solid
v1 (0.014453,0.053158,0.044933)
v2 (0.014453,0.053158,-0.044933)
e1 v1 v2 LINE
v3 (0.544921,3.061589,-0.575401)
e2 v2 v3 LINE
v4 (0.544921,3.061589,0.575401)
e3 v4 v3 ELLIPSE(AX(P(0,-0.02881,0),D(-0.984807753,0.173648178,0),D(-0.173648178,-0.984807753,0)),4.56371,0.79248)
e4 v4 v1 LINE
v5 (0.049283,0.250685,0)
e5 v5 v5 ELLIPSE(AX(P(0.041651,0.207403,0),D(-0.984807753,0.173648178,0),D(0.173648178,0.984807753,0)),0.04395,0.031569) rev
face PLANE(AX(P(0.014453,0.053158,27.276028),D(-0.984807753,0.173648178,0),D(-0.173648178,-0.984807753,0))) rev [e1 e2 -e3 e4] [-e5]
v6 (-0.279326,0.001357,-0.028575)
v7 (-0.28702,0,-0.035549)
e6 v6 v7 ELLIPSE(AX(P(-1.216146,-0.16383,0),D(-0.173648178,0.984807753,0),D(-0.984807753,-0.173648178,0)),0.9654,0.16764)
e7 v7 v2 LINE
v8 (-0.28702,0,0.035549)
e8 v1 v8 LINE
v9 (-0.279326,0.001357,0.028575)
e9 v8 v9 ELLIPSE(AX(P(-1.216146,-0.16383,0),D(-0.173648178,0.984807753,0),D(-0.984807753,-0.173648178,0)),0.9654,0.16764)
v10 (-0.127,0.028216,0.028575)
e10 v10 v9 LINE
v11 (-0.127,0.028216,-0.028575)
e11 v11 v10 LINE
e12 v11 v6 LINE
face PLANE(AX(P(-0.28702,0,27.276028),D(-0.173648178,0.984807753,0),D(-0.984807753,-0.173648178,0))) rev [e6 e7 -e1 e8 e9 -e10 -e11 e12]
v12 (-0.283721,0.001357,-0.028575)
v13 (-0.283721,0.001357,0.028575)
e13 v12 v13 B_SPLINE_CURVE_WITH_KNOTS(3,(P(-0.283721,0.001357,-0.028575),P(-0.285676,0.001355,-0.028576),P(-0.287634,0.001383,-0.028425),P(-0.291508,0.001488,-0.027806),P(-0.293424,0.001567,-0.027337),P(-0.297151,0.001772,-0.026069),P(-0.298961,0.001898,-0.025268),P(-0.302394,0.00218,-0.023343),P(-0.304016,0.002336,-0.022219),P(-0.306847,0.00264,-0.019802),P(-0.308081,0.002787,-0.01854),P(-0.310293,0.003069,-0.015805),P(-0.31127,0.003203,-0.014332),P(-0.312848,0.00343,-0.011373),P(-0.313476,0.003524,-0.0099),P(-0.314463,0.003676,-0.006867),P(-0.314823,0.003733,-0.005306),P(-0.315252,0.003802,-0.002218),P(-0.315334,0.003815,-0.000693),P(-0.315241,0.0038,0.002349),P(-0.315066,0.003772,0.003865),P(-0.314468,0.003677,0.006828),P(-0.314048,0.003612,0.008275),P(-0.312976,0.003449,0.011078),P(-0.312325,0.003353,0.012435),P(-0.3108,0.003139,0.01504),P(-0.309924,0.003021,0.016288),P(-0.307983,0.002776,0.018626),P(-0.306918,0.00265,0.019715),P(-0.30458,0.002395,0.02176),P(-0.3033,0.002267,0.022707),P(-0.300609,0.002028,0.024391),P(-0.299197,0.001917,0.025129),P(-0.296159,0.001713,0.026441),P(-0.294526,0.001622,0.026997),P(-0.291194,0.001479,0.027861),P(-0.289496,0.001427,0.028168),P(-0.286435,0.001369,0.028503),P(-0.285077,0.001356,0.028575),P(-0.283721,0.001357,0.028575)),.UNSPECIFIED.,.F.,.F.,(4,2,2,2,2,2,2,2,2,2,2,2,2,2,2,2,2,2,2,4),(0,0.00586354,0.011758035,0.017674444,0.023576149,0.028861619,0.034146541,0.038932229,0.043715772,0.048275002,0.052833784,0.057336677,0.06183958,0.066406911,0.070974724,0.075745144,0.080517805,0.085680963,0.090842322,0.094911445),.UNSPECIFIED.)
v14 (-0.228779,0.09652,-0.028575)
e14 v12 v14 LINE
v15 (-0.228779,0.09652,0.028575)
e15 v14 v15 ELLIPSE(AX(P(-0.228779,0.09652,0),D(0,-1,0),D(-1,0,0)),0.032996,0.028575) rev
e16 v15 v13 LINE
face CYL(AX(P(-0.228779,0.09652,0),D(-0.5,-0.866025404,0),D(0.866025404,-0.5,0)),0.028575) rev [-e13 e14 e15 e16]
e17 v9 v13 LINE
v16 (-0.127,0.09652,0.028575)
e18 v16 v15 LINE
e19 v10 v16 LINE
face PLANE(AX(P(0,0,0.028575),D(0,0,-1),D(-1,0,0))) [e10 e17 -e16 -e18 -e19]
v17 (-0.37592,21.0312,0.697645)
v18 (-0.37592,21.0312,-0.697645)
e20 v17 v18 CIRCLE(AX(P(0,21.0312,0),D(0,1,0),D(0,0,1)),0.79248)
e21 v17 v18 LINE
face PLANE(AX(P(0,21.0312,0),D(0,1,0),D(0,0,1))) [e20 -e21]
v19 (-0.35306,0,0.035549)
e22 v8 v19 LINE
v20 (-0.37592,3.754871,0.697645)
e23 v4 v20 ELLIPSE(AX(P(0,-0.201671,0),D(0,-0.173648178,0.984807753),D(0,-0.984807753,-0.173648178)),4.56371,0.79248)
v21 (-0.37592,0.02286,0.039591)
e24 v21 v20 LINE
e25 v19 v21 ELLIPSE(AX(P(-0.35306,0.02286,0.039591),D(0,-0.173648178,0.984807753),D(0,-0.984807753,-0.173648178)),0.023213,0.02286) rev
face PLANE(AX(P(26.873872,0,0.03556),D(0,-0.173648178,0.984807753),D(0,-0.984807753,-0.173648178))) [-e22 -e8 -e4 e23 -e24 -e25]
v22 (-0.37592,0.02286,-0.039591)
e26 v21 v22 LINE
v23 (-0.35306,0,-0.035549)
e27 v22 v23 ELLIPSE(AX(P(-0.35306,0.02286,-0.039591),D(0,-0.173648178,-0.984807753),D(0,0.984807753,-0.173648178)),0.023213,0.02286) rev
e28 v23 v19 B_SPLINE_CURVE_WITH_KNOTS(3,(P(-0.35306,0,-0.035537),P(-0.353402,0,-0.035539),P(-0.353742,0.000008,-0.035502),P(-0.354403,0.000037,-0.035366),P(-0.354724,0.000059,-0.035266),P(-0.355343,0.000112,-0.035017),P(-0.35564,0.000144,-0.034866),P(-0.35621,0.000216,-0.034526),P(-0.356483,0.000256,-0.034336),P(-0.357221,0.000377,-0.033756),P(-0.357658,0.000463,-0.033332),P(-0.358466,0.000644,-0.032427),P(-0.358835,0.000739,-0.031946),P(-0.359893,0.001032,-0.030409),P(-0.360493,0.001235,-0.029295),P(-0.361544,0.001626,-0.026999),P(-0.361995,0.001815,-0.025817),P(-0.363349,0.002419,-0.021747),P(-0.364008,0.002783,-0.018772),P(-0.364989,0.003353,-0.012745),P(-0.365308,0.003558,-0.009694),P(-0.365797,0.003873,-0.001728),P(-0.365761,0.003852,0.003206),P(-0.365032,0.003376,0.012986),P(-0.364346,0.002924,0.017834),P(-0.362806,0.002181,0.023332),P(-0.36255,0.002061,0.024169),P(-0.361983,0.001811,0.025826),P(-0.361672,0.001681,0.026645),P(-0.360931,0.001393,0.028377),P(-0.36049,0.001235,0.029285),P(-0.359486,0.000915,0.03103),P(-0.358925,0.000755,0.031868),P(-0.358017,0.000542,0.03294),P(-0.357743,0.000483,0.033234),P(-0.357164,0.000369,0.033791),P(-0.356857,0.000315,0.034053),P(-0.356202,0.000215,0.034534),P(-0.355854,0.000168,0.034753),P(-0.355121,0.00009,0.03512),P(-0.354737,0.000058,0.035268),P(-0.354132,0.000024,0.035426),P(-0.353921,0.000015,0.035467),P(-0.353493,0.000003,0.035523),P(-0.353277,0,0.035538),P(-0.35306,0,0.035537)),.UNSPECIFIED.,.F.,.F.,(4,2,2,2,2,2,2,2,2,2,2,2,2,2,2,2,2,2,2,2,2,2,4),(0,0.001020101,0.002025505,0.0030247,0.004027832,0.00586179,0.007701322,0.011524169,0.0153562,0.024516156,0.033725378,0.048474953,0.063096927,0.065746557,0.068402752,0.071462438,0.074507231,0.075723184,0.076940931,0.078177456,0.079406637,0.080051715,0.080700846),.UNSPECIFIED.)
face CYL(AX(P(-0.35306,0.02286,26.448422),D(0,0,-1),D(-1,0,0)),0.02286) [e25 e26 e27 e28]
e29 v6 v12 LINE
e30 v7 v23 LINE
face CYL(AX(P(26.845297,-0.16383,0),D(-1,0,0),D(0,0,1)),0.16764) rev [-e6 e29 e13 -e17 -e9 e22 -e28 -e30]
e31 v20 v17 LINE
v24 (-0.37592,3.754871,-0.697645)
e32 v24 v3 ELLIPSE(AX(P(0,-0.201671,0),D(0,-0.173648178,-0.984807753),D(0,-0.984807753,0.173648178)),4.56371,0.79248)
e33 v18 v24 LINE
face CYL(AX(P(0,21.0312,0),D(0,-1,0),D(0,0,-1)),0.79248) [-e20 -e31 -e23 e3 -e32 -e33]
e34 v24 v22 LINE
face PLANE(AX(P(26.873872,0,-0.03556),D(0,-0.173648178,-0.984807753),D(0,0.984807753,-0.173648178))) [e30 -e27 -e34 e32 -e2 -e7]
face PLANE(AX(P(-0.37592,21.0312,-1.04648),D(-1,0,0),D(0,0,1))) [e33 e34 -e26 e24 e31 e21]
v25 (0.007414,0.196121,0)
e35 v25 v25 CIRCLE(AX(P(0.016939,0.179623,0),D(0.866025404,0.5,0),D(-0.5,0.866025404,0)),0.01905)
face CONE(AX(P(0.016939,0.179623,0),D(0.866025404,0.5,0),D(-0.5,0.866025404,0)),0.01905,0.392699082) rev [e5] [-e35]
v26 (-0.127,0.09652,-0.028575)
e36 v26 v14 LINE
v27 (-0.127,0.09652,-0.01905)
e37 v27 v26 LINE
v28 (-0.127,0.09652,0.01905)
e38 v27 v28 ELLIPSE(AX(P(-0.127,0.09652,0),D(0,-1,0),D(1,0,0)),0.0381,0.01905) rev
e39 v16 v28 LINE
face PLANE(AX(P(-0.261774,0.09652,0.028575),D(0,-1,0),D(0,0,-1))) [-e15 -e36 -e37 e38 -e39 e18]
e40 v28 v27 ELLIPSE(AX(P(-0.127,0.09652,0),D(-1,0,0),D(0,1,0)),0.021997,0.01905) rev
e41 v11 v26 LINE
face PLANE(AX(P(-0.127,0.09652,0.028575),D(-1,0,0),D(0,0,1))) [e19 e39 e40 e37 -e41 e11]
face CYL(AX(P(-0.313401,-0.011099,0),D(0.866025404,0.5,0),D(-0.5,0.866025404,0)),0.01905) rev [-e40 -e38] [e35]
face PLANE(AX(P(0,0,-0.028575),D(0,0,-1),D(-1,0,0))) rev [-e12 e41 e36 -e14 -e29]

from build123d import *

# Parameters (mm, degrees)
TD_SKETCH_R                             = 0.79248
TL_FEATURE_DEPTH                        = 21.0312
TDF_STD_SKETCH_W                        = 2.09296
TDF_STD_SKETCH_H                        = 2.09296
TDF_STD_FEATURE_DEPTH                   = 22.061040395
ISA_20_STD_FEATURE_DEPTH                = 22.061040395
ISA_20_STD_FEATURE_DEPTH_BACK           = 22.061040395
F_10BA_STD_FEATURE_DEPTH                = 22.061040395
F_10BA_STD_FEATURE_DEPTH_BACK           = 22.061040395
FRO_STD_FEATURE_DEPTH                   = 22.061040395
FRO_STD_FEATURE_DEPTH_BACK              = 22.061040395
C_STD_FEATURE_DEPTH                     = 22.061040395
C_STD_FEATURE_DEPTH_BACK                = 22.061040395
ERW_STD_FEATURE_DEPTH                   = 0.028575
H_STD_FEATURE_REACH                     = 22.881
H_STD_SKETCH_R                          = 0.01905
H_STD_SKETCH_3_R                        = 0.01905
FUNNEL_FINAL_DIAMETRE_STD_FEATURE_DEPTH = 2.499995
FUNNEL_FINAL_DIAMETRE_STD_FEATURE_DRAFT = -22.5
ROUND_BR_STD_FEATURE_START              = -1
ROUND_BR_STD_FEATURE_DEPTH              = 1.020088772


with BuildPart() as part:
    # TD_sketch → TL_feature (new body)
    with BuildSketch(Plane(origin=(0, 0, 0), x_dir=(1, 0, 0), z_dir=(0, 1, 0))):
        with Locations(Location((0, 0, 0), (0, 0, 270))):
            Circle(TD_SKETCH_R)
    extrude(amount=TL_FEATURE_DEPTH)

    # TDF_STD_sketch → TDF_STD_feature (cut, through all)
    with BuildSketch(Plane(origin=(0, 0, 0), x_dir=(1, 0, 0), z_dir=(0, 1, 0))):
        with Locations((-1.4224, 0)):
            Rectangle(TDF_STD_SKETCH_W, TDF_STD_SKETCH_H)
    extrude(amount=TDF_STD_FEATURE_DEPTH, mode=Mode.SUBTRACT)

    # ISA_20_STD_sketch → ISA_20_STD_feature (cut, two sides: drawn at the far end of the back side and taken through both)
    with BuildSketch(Plane(origin=(0, 0, 0), x_dir=(0, 0, -1), z_dir=(1, 0, 0)).offset(-ISA_20_STD_FEATURE_DEPTH_BACK)):
        Polygon((-12.952451681, 73.255332957), (-3.743927997, 21.0312), (-0.03556, 0), (0.03556, 0), (3.743927997, 21.0312), (12.952451681, 73.255332957), (12.952451681, -32.804215817), (-12.952451681, -32.804215817), align=None)
    extrude(amount=ISA_20_STD_FEATURE_DEPTH + ISA_20_STD_FEATURE_DEPTH_BACK, mode=Mode.SUBTRACT)

    # 10BA_STD_sketch → 10BA_STD_feature (cut, two sides: drawn at the far end of the back side and taken through both)
    with BuildSketch(Plane.XY.offset(-F_10BA_STD_FEATURE_DEPTH_BACK)):
        Polygon((-53.226091717, 0), (-0.37592, 0), (-0.28702, 0), (0.014453164, 0.053157853), (3.713447997, 21.0312), (12.890784005, 73.078458855), (91.272293615, 2.163710365), (25.155417893, -70.914748491), align=None)
    extrude(amount=F_10BA_STD_FEATURE_DEPTH + F_10BA_STD_FEATURE_DEPTH_BACK, mode=Mode.SUBTRACT)

    # FRO_STD_sketch → FRO_STD_feature (cut, two sides: drawn at the far end of the back side and taken through both)
    with BuildSketch(Plane.XY.offset(-FRO_STD_FEATURE_DEPTH_BACK)):
        with BuildLine():
            Line((-0.37592, 52.147609748), (-0.37592, 0.02286))
            ThreePointArc((-0.37592, 0.02286), (-0.369224461, 0.006695539), (-0.35306, 0))
            Line((-0.35306, 0), (51.771689748, 0))
            Line((51.771689748, 0), (-21.943838281, -73.715528029))
            Line((-21.943838281, -73.715528029), (-74.091448029, -21.567918281))
            Line((-74.091448029, -21.567918281), (-0.37592, 52.147609748))
        make_face()
    extrude(amount=FRO_STD_FEATURE_DEPTH + FRO_STD_FEATURE_DEPTH_BACK, mode=Mode.SUBTRACT)

    # C_STD_sketch → C_STD_feature (cut, two sides: drawn at the far end of the back side and taken through both)
    with BuildSketch(Plane(origin=(0, 0, 0), x_dir=(0, 0, -1), z_dir=(1, 0, 0)).offset(-C_STD_FEATURE_DEPTH_BACK)):
        with BuildLine():
            Line((-50.946547499, -11.043402092), (-0.035537314, 0))
            ThreePointArc((-0.035537314, 0), (0, 0.00381), (0.035537314, 0))
            Line((0.035537314, 0), (50.946547499, -11.043402092))
            Line((50.946547499, -11.043402092), (50.946547499, -115.233376423))
            Line((50.946547499, -115.233376423), (-50.946547499, -115.233376423))
            Line((-50.946547499, -115.233376423), (-50.946547499, -11.043402092))
        make_face()
    extrude(amount=C_STD_FEATURE_DEPTH + C_STD_FEATURE_DEPTH_BACK, mode=Mode.SUBTRACT)


with BuildPart() as body_2:
    # ERW_STD_sketch → ERW_STD_feature (new, symmetric)
    with BuildSketch(Plane.XY):
        Polygon((-0.127, 0.09652), (-0.127, 0), (-0.3175, 0), (-0.261774152, 0.09652), align=None)
    extrude(amount=ERW_STD_FEATURE_DEPTH, both=True)

    # H_STD_sketch → H_STD_feature (add, up to next)
    with BuildSketch(Plane(origin=(0.01693898, 0.179623209, 0), x_dir=(0, 0, -1), z_dir=(0.8660254037844415, 0.4999999999999953, 0)), mode=Mode.PRIVATE) as h_std_feature_sk1:
        with Locations(Location((0, 0, 0), (0, 0, 90))):
            Circle(H_STD_SKETCH_R)
    h_std_feature_tool1 = extrude(h_std_feature_sk1.sketch, amount=-H_STD_FEATURE_REACH, mode=Mode.PRIVATE) - body_2.part
    add(h_std_feature_tool1.solids().sort_by_distance((0.016939, 0.179623, 0))[0])


with BuildPart() as funnel_final_diametre_std_feature_tool:
    # H_STD_sketch<3> → funnel_final_diametre_STD_feature (with draft: the straight prism first)
    with BuildSketch(Plane(origin=(0.01693898, 0.179623209, 0), x_dir=(0, 0, -1), z_dir=(0.8660254037844415, 0.4999999999999953, 0))):
        with Locations(Location((0, 0, 0), (0, 0, 90))):
            Circle(H_STD_SKETCH_3_R)
    extrude(amount=FUNNEL_FINAL_DIAMETRE_STD_FEATURE_DEPTH)
    # funnel_final_diametre_STD_feature: the draft: its side faces are tilted about the plane it starts from
    funnel_final_diametre_std_feature_sides = [funnel_final_diametre_std_feature_tool.faces().sort_by_distance(p)[0] for p in [
        (1.10899357, 0.788124175, 0),
    ]]
    draft(funnel_final_diametre_std_feature_sides, Plane(origin=(0.01693898, 0.179623209, 0), x_dir=(0, 0, -1), z_dir=(0.8660254037844415, 0.4999999999999953, 0)), FUNNEL_FINAL_DIAMETRE_STD_FEATURE_DRAFT)


with BuildPart() as body_2_1:
    add(body_2.part)

    # funnel_final_diametre_STD_feature: add funnel_final_diametre_std_feature_tool
    add(funnel_final_diametre_std_feature_tool.part)

    # ROUND_BR_STD_feature: read off the stored shape, not the designer's step
    # ROUND_BR_STD_feature outline → ROUND_BR_STD_feature (cut)
    with BuildSketch(Plane(origin=(0, 0, 0), x_dir=(0.8660254037844362, -0.5000000000000042, 0), z_dir=(0.5000000000000042, 0.8660254037844363, 0)).offset(ROUND_BR_STD_FEATURE_START)):
        with BuildLine():
            Line((-0.274963066, -0.028575), (-0.246388066, -0.028575))
            ThreePointArc((-0.246388066, -0.028575), (-0.266593642, -0.020205576), (-0.274963066, 0))
            Line((-0.274963066, 0), (-0.274963066, -0.028575))
        make_face()
        with BuildLine():
            Line((-0.274963066, 0.028575), (-0.274963066, 0))
            ThreePointArc((-0.274963066, 0), (-0.266593642, 0.020205576), (-0.246388066, 0.028575))
            Line((-0.246388066, 0.028575), (-0.274963066, 0.028575))
        make_face()
    extrude(amount=ROUND_BR_STD_FEATURE_DEPTH, mode=Mode.SUBTRACT)


with BuildPart() as part_1:
    add(part.part)

    # COMBINE_STD_feature: cut body 2
    add(body_2_1.part, mode=Mode.SUBTRACT)


solid = part_1.part
